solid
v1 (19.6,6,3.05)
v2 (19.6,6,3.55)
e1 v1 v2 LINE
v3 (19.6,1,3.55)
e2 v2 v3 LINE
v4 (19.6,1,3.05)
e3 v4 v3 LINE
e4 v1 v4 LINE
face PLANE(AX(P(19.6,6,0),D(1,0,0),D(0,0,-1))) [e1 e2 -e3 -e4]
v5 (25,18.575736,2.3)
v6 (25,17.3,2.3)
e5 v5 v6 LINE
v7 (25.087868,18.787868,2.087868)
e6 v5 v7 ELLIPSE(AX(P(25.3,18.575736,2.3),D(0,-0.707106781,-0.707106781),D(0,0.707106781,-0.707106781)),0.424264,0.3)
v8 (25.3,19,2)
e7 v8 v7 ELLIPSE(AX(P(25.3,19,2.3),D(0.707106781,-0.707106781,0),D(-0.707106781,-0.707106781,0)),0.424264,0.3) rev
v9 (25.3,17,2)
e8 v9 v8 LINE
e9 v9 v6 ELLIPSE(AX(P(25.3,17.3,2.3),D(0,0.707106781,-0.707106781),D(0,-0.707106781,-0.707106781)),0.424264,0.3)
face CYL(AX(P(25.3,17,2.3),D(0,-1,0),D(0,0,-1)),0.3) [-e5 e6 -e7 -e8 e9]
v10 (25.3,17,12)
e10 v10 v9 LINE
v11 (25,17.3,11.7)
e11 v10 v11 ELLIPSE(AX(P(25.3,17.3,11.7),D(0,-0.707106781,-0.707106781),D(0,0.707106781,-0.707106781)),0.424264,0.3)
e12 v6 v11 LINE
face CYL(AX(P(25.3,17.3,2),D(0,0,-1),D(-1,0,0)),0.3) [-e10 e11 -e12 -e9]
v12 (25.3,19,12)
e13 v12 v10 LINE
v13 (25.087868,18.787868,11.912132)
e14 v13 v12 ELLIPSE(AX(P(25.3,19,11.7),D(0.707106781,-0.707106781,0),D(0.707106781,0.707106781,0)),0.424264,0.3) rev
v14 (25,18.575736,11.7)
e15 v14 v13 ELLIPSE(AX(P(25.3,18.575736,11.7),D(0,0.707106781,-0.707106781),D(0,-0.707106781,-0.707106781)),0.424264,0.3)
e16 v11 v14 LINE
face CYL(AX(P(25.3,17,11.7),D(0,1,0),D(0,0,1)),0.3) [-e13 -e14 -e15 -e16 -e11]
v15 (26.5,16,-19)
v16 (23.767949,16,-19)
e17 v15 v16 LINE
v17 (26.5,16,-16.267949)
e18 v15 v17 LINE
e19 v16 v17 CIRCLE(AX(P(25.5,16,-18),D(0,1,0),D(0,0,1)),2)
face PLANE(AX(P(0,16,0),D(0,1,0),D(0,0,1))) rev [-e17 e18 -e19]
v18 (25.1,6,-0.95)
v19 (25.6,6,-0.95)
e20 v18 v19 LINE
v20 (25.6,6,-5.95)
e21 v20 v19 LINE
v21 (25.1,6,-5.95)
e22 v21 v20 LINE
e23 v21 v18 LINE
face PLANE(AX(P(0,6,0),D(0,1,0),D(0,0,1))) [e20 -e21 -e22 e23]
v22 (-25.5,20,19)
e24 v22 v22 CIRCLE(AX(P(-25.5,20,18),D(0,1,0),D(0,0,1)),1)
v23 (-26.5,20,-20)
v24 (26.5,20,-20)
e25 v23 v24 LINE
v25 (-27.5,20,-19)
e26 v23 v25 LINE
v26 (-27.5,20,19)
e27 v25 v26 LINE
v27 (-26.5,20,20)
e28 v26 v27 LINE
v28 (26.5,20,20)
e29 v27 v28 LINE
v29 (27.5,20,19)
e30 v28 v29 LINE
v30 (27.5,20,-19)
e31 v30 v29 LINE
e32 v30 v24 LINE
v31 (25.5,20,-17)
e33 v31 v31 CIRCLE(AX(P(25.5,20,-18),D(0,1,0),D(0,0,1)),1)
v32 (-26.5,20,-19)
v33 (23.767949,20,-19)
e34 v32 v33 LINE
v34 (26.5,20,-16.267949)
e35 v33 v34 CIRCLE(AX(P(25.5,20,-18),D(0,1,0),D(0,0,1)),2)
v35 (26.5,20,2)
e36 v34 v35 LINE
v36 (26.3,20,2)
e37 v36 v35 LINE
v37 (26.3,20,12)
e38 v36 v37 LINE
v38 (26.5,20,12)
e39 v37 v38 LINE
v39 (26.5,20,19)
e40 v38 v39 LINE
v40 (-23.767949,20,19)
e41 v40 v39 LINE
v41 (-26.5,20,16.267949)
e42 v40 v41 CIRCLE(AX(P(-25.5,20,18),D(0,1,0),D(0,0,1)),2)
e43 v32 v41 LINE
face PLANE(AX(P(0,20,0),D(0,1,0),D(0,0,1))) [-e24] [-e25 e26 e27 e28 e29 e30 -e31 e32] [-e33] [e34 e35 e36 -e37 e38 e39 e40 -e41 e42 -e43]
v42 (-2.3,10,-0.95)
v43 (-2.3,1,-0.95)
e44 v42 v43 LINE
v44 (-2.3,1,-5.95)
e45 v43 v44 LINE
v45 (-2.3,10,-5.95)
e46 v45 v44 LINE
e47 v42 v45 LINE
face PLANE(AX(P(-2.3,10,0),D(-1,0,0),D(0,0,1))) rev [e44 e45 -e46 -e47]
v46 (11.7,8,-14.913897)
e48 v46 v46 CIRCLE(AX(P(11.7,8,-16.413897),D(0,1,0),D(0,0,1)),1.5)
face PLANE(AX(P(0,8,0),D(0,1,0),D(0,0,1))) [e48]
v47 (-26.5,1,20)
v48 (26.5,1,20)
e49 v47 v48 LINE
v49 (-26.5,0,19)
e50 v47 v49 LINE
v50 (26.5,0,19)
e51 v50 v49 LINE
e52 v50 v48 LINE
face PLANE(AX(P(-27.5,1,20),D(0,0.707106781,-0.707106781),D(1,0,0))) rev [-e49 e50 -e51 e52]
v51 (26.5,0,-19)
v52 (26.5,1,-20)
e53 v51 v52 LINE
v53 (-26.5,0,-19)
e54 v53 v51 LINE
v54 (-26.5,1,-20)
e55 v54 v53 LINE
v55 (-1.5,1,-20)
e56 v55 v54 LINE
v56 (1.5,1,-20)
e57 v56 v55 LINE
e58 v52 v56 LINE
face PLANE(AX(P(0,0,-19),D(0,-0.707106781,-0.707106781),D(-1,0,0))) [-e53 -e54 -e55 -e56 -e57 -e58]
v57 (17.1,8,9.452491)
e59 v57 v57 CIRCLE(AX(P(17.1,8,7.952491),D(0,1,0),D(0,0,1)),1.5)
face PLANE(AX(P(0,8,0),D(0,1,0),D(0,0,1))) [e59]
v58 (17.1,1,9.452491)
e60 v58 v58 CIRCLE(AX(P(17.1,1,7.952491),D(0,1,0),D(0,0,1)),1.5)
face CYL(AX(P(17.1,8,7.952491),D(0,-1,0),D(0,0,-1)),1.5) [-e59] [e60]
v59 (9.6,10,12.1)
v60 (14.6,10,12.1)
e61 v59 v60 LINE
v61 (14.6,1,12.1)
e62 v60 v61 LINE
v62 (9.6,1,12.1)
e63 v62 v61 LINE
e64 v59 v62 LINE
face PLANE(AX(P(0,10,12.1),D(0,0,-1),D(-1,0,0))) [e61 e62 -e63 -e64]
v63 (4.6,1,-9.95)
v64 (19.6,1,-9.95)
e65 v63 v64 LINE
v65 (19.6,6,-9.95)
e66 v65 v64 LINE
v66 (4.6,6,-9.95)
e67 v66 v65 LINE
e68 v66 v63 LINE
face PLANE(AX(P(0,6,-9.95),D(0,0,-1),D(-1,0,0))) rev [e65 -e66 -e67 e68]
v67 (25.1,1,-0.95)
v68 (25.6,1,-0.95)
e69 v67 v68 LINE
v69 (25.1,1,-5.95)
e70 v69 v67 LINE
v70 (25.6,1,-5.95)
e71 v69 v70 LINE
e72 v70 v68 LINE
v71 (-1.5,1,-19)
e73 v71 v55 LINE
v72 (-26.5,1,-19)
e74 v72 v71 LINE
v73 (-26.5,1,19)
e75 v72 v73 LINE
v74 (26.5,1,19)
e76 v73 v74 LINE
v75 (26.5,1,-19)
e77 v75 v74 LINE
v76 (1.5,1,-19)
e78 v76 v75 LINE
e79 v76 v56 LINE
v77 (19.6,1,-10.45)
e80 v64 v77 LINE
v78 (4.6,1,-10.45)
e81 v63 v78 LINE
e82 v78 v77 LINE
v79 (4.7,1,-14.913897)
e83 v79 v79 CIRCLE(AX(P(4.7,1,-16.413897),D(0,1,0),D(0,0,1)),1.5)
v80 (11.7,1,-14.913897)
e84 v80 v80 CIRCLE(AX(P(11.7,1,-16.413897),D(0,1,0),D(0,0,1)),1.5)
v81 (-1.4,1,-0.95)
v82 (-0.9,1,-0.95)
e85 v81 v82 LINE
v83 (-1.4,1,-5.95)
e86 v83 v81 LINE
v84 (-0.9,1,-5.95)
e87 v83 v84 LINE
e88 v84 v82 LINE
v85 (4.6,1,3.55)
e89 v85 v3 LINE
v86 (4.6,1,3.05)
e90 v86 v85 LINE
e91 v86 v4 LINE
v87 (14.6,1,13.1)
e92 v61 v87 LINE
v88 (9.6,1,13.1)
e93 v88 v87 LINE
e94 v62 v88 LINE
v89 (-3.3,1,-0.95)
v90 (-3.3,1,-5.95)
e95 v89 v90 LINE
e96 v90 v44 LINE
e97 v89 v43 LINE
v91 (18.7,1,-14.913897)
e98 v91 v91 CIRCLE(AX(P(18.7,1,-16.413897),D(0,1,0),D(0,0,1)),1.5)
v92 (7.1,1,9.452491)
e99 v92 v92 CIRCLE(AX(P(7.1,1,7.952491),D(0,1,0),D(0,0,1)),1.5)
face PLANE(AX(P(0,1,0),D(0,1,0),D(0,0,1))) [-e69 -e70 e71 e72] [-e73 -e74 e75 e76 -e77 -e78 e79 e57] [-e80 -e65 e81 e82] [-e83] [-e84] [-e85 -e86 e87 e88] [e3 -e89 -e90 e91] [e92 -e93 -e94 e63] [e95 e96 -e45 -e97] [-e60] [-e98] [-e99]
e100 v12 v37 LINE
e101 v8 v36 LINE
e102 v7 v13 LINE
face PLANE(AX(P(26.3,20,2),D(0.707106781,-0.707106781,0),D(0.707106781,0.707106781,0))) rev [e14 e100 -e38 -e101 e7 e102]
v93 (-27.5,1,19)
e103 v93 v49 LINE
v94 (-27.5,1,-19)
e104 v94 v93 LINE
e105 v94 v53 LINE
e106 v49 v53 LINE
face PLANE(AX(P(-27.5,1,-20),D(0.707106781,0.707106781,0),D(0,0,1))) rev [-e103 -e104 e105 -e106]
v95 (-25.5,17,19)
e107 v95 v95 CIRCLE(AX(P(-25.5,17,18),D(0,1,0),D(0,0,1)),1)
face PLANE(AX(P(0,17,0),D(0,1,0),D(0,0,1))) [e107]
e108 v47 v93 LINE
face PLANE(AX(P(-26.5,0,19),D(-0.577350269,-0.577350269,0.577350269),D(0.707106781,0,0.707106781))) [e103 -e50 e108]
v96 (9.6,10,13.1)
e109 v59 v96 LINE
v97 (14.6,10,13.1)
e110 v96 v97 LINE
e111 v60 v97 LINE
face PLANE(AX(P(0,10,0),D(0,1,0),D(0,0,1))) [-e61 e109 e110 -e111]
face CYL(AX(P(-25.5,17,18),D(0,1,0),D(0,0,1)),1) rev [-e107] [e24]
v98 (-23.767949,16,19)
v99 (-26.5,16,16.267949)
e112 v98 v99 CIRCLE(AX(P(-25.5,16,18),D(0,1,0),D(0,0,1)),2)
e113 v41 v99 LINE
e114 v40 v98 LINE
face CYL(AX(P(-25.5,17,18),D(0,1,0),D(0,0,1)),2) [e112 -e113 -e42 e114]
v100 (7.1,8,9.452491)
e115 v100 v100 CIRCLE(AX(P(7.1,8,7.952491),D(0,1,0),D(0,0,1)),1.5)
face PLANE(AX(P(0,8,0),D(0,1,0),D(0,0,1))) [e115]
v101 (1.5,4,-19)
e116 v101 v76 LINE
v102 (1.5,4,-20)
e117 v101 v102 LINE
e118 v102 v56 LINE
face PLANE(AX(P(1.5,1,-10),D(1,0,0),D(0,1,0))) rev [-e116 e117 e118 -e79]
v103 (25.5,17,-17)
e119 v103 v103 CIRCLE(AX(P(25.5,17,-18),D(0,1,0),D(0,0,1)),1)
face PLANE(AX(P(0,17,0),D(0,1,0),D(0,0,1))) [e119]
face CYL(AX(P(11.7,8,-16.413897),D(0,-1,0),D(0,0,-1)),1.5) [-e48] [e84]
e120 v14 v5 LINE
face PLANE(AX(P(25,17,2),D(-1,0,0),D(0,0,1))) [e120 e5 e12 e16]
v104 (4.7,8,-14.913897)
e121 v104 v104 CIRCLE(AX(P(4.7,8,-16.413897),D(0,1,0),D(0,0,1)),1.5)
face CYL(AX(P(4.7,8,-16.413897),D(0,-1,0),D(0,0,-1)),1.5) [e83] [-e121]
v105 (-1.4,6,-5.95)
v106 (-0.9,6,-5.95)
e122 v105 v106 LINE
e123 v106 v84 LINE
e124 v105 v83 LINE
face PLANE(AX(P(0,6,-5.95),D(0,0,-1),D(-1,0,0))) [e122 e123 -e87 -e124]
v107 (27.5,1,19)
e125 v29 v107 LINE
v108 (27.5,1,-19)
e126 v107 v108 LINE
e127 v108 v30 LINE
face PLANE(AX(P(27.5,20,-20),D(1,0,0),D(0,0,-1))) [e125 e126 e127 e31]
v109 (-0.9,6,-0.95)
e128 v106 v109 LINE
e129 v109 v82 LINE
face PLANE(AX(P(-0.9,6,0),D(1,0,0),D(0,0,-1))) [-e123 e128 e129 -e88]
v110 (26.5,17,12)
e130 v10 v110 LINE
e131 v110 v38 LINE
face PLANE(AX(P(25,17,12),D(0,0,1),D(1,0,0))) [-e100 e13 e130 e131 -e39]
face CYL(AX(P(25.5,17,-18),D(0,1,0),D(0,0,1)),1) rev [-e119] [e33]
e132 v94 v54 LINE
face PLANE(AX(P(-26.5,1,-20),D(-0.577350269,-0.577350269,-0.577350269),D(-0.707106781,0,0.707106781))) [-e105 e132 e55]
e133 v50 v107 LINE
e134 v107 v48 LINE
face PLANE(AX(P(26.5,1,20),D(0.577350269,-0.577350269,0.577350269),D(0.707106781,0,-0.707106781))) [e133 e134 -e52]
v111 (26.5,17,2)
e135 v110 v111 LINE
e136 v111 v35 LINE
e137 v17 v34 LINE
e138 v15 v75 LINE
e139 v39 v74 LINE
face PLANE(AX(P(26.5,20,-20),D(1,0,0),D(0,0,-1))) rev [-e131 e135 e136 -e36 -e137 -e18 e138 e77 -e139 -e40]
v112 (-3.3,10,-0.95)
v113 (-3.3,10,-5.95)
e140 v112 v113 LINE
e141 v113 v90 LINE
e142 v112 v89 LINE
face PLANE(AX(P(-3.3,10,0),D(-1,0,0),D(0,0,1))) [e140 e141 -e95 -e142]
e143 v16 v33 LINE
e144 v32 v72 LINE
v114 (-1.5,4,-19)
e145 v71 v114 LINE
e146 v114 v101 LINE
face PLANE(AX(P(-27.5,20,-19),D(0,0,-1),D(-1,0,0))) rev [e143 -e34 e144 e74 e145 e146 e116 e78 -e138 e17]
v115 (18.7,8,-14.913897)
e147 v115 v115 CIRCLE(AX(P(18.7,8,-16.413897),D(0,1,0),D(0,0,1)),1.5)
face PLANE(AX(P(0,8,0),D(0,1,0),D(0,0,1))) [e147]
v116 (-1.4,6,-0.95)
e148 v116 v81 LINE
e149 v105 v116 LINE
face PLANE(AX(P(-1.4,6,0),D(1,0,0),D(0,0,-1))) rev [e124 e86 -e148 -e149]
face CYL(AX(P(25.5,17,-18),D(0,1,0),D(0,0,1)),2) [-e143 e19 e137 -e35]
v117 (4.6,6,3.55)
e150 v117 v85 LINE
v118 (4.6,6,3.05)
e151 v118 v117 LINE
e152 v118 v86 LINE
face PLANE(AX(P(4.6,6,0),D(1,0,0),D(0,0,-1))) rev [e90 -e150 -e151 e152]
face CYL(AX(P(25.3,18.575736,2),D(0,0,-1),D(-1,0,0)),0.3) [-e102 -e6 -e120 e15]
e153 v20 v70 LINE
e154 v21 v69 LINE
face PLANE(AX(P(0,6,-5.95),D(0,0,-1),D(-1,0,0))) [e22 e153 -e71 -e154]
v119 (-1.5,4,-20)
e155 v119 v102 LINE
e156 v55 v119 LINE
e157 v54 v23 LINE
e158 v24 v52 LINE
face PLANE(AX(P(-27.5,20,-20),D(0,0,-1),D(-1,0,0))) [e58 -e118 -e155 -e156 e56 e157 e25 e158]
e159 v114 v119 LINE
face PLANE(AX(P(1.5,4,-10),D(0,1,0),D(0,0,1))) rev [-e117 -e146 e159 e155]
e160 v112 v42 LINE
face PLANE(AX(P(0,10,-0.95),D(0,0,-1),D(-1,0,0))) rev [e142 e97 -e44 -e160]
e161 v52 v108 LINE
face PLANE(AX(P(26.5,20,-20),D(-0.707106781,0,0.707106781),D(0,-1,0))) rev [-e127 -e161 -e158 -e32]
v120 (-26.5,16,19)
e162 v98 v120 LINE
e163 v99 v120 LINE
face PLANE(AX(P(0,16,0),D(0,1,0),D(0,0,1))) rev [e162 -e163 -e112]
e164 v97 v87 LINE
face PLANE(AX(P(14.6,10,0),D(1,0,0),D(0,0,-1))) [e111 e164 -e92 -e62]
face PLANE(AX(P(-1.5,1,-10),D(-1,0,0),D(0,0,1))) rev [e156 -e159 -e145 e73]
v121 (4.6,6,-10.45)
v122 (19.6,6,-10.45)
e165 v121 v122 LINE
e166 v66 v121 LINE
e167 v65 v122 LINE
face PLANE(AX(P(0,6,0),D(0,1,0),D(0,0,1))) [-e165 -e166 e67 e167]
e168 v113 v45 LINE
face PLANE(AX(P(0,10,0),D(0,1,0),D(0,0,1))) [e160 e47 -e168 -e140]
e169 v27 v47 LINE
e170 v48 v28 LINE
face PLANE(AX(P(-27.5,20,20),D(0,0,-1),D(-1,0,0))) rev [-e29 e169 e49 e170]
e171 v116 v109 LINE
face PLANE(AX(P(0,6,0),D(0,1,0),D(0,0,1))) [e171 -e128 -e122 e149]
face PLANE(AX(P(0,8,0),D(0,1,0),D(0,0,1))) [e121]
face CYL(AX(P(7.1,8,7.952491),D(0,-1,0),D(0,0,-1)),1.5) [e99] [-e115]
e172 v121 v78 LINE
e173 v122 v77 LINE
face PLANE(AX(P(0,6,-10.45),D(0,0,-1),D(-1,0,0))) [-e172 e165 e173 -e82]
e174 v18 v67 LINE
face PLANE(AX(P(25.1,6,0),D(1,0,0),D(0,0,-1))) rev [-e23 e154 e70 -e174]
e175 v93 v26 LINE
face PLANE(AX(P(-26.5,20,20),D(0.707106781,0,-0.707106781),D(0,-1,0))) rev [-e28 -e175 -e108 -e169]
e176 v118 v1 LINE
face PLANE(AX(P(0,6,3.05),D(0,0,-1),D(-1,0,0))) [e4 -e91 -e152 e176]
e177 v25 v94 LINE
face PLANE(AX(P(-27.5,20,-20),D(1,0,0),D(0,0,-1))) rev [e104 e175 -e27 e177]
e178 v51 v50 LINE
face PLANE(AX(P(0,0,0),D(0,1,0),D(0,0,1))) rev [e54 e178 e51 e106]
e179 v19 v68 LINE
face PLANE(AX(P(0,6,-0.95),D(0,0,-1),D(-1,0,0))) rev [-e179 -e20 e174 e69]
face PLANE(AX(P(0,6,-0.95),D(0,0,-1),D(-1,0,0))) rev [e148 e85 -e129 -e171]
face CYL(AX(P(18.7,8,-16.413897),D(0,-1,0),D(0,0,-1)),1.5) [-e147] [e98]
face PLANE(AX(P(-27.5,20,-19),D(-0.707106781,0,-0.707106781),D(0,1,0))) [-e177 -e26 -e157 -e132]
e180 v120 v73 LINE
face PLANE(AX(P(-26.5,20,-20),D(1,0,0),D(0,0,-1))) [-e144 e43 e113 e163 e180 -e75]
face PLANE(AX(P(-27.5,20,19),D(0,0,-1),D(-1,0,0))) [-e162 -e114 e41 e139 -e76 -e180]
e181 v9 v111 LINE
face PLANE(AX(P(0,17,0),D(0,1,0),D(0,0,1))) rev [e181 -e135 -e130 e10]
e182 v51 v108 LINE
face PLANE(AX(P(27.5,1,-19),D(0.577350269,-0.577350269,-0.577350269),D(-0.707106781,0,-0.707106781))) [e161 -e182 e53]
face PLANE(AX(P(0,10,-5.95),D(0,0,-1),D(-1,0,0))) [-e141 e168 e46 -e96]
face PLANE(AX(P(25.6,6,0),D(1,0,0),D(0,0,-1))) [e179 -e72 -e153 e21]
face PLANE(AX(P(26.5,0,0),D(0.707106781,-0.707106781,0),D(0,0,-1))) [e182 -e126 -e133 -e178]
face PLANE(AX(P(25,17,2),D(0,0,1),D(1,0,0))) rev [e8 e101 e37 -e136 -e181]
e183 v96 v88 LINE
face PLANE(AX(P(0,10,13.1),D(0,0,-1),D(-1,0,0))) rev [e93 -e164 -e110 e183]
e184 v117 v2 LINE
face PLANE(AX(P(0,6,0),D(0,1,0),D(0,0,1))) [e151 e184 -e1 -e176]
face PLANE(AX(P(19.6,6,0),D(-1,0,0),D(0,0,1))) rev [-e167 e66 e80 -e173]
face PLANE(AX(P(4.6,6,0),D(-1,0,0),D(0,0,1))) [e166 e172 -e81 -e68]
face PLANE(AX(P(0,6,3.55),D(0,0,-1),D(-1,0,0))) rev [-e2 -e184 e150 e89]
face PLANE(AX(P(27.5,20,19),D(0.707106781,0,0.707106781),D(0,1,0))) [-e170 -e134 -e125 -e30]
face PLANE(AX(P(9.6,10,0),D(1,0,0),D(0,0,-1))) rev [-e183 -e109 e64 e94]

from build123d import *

# Parameters (mm, degrees)
SKETCH_1_W          = 55
SKETCH_1_H          = 40
EXTRUDE_1_DEPTH     = 20
SKETCH_2_R          = 1
CUT_EXTRUDE_2_DEPTH = 3
SHELL_START         = 1
SHELL_1_DEPTH       = 19
SHELL_1_2_DEPTH     = 15
CHAMFER_2_SIZE      = 1
SKETCH_8_W          = 3
SKETCH_8_H          = 3
CUT_EXTRUDE_5_DEPTH = 10
SKETCH_10_W         = 1.5
SKETCH_10_H         = 10
EXTRUDE_2_DEPTH     = 3
SKETCH_11_W         = 0.5
SKETCH_11_H         = 5
SKETCH_11_W_2       = 15
SKETCH_11_H_2       = 0.5
EXTRUDE_6_DEPTH     = 5
SKETCH_11_7_R       = 1.5
EXTRUDE_7_DEPTH     = 7
SKETCH_11_8_W       = 1
SKETCH_11_8_H       = 5
SKETCH_11_8_W_2     = 5
SKETCH_11_8_H_2     = 1
EXTRUDE_8_DEPTH     = 9
CUT_EXTRUDE_6_DEPTH = 10
FILLET_1_R          = 0.3


# Read off the part's stored shape, not the designer's step: 抽壳1
with BuildPart() as part:
    # 草图1 → 凸台-拉伸1 (new body)
    with BuildSketch(Plane(origin=(0, 0, 0), x_dir=(1, 0, 0), z_dir=(0, 1, 0))):
        Rectangle(SKETCH_1_W, SKETCH_1_H)
    extrude(amount=EXTRUDE_1_DEPTH)

    # 草图2 → 切除-拉伸2 (cut)
    with BuildSketch(Plane(origin=(0, 20, 0), x_dir=(1, 0, 0), z_dir=(0, 1, 0))):
        with Locations(Location((-25.5, -18, 0), (0, 0, 270))):
            Circle(SKETCH_2_R)
        with Locations(Location((25.5, 18, 0), (0, 0, 270))):
            Circle(SKETCH_2_R)
    extrude(amount=-CUT_EXTRUDE_2_DEPTH, mode=Mode.SUBTRACT)

    # 抽壳1 outline → 抽壳1 (cut)
    with BuildSketch(Plane(origin=(0, 0, 0), x_dir=(1, 0, 0), z_dir=(0, 1, 0)).offset(SHELL_START)):
        with BuildLine():
            ThreePointArc((26.5, 16.267949192), (24.085786438, 16.585786438), (23.767949192, 19))
            Line((23.767949192, 19), (-26.5, 19))
            Line((-26.5, 19), (-26.5, -16.267949192))
            ThreePointArc((-26.5, -16.267949192), (-24.085786438, -16.585786438), (-23.767949192, -19))
            Line((-23.767949192, -19), (26.5, -19))
            Line((26.5, -19), (26.5, 16.267949192))
        make_face()
    extrude(amount=SHELL_1_DEPTH, mode=Mode.SUBTRACT)

    # Shell 1 2 outline → Shell 1 2 (cut)
    with BuildSketch(Plane(origin=(0, 0, 0), x_dir=(1, 0, 0), z_dir=(0, 1, 0)).offset(SHELL_START)):
        with BuildLine():
            Line((26.5, 16.267949192), (26.5, 19))
            Line((26.5, 19), (23.767949192, 19))
            ThreePointArc((23.767949192, 19), (24.085786438, 16.585786438), (26.5, 16.267949192))
        make_face()
        with BuildLine():
            ThreePointArc((-23.767949192, -19), (-24.085786438, -16.585786438), (-26.5, -16.267949192))
            Line((-26.5, -16.267949192), (-26.5, -19))
            Line((-26.5, -19), (-23.767949192, -19))
        make_face()
    extrude(amount=SHELL_1_2_DEPTH, mode=Mode.SUBTRACT)

    # 倒角2
    chamfer_2_edges = [part.edges().sort_by_distance(p)[0] for p in [
        (0, 0, -20),
        (27.5, 0, 0),
        (0, 0, 20),
        (-27.5, 0, 0),
        (-27.5, 10, -20),
        (27.5, 10, -20),
        (27.5, 10, 20),
        (-27.5, 10, 20),
    ]]
    chamfer(chamfer_2_edges, length=CHAMFER_2_SIZE)

    # 草图8 → 切除-拉伸5 (cut)
    with BuildSketch(Plane(origin=(0, 0, -20), x_dir=(-1, 0, 0), z_dir=(0, 0, -1))):
        with Locations((0, 2.5)):
            Rectangle(SKETCH_8_W, SKETCH_8_H)
    extrude(amount=-CUT_EXTRUDE_5_DEPTH, mode=Mode.SUBTRACT)

    # 草图10 → 凸台-拉伸2 (add)
    with BuildSketch(Plane(origin=(0, 20, 0), x_dir=(1, 0, 0), z_dir=(0, 1, 0))):
        with Locations((25.75, -7)):
            Rectangle(SKETCH_10_W, SKETCH_10_H)
    extrude(amount=-EXTRUDE_2_DEPTH)

    # 草图11 → 凸台-拉伸6 (add)
    with BuildSketch(Plane(origin=(0, 1, 0), x_dir=(1, 0, 0), z_dir=(0, 1, 0))):
        with Locations((25.35, 3.45)):
            Rectangle(SKETCH_11_W, SKETCH_11_H)
        with Locations((12.1, 10.2)):
            Rectangle(SKETCH_11_W_2, SKETCH_11_H_2)
        with Locations((12.1, -3.3)):
            Rectangle(SKETCH_11_W_2, SKETCH_11_H_2)
        with Locations((-1.15, 3.45)):
            Rectangle(SKETCH_11_W, SKETCH_11_H)
    extrude(amount=EXTRUDE_6_DEPTH)

    # 草图11<7> → 凸台-拉伸7 (add)
    with BuildSketch(Plane(origin=(0, 1, 0), x_dir=(1, 0, 0), z_dir=(0, 1, 0))):
        with Locations(Location((4.7, 16.413896805, 0), (0, 0, 270))):
            Circle(SKETCH_11_7_R)
        with Locations(Location((11.7, 16.413896805, 0), (0, 0, 270))):
            Circle(SKETCH_11_7_R)
        with Locations(Location((18.7, 16.413896805, 0), (0, 0, 270))):
            Circle(SKETCH_11_7_R)
        with Locations(Location((17.1, -7.952490826, 0), (0, 0, 270))):
            Circle(SKETCH_11_7_R)
        with Locations(Location((7.1, -7.952490826, 0), (0, 0, 270))):
            Circle(SKETCH_11_7_R)
    extrude(amount=EXTRUDE_7_DEPTH)

    # 草图11<8> → 凸台-拉伸8 (add)
    with BuildSketch(Plane(origin=(0, 1, 0), x_dir=(1, 0, 0), z_dir=(0, 1, 0))):
        with Locations((-2.8, 3.45)):
            Rectangle(SKETCH_11_8_W, SKETCH_11_8_H)
        with Locations((12.1, -12.6)):
            Rectangle(SKETCH_11_8_W_2, SKETCH_11_8_H_2)
    extrude(amount=EXTRUDE_8_DEPTH)

    # 草图12 → 切除-拉伸6 (cut)
    with BuildSketch(Plane.XY.offset(12)):
        Polygon((26.3, 20), (25, 18.7), (25, 20), align=None)
    extrude(amount=-CUT_EXTRUDE_6_DEPTH, mode=Mode.SUBTRACT)

    # 圆角1
    fillet_1_edges = [part.edges().sort_by_distance(p)[0] for p in [
        (25, 18.7, 7),
        (25, 17, 7),
        (25, 17.85, 12),
        (25, 17.85, 2),
    ]]
    fillet(fillet_1_edges, radius=FILLET_1_R)


solid = part.part
